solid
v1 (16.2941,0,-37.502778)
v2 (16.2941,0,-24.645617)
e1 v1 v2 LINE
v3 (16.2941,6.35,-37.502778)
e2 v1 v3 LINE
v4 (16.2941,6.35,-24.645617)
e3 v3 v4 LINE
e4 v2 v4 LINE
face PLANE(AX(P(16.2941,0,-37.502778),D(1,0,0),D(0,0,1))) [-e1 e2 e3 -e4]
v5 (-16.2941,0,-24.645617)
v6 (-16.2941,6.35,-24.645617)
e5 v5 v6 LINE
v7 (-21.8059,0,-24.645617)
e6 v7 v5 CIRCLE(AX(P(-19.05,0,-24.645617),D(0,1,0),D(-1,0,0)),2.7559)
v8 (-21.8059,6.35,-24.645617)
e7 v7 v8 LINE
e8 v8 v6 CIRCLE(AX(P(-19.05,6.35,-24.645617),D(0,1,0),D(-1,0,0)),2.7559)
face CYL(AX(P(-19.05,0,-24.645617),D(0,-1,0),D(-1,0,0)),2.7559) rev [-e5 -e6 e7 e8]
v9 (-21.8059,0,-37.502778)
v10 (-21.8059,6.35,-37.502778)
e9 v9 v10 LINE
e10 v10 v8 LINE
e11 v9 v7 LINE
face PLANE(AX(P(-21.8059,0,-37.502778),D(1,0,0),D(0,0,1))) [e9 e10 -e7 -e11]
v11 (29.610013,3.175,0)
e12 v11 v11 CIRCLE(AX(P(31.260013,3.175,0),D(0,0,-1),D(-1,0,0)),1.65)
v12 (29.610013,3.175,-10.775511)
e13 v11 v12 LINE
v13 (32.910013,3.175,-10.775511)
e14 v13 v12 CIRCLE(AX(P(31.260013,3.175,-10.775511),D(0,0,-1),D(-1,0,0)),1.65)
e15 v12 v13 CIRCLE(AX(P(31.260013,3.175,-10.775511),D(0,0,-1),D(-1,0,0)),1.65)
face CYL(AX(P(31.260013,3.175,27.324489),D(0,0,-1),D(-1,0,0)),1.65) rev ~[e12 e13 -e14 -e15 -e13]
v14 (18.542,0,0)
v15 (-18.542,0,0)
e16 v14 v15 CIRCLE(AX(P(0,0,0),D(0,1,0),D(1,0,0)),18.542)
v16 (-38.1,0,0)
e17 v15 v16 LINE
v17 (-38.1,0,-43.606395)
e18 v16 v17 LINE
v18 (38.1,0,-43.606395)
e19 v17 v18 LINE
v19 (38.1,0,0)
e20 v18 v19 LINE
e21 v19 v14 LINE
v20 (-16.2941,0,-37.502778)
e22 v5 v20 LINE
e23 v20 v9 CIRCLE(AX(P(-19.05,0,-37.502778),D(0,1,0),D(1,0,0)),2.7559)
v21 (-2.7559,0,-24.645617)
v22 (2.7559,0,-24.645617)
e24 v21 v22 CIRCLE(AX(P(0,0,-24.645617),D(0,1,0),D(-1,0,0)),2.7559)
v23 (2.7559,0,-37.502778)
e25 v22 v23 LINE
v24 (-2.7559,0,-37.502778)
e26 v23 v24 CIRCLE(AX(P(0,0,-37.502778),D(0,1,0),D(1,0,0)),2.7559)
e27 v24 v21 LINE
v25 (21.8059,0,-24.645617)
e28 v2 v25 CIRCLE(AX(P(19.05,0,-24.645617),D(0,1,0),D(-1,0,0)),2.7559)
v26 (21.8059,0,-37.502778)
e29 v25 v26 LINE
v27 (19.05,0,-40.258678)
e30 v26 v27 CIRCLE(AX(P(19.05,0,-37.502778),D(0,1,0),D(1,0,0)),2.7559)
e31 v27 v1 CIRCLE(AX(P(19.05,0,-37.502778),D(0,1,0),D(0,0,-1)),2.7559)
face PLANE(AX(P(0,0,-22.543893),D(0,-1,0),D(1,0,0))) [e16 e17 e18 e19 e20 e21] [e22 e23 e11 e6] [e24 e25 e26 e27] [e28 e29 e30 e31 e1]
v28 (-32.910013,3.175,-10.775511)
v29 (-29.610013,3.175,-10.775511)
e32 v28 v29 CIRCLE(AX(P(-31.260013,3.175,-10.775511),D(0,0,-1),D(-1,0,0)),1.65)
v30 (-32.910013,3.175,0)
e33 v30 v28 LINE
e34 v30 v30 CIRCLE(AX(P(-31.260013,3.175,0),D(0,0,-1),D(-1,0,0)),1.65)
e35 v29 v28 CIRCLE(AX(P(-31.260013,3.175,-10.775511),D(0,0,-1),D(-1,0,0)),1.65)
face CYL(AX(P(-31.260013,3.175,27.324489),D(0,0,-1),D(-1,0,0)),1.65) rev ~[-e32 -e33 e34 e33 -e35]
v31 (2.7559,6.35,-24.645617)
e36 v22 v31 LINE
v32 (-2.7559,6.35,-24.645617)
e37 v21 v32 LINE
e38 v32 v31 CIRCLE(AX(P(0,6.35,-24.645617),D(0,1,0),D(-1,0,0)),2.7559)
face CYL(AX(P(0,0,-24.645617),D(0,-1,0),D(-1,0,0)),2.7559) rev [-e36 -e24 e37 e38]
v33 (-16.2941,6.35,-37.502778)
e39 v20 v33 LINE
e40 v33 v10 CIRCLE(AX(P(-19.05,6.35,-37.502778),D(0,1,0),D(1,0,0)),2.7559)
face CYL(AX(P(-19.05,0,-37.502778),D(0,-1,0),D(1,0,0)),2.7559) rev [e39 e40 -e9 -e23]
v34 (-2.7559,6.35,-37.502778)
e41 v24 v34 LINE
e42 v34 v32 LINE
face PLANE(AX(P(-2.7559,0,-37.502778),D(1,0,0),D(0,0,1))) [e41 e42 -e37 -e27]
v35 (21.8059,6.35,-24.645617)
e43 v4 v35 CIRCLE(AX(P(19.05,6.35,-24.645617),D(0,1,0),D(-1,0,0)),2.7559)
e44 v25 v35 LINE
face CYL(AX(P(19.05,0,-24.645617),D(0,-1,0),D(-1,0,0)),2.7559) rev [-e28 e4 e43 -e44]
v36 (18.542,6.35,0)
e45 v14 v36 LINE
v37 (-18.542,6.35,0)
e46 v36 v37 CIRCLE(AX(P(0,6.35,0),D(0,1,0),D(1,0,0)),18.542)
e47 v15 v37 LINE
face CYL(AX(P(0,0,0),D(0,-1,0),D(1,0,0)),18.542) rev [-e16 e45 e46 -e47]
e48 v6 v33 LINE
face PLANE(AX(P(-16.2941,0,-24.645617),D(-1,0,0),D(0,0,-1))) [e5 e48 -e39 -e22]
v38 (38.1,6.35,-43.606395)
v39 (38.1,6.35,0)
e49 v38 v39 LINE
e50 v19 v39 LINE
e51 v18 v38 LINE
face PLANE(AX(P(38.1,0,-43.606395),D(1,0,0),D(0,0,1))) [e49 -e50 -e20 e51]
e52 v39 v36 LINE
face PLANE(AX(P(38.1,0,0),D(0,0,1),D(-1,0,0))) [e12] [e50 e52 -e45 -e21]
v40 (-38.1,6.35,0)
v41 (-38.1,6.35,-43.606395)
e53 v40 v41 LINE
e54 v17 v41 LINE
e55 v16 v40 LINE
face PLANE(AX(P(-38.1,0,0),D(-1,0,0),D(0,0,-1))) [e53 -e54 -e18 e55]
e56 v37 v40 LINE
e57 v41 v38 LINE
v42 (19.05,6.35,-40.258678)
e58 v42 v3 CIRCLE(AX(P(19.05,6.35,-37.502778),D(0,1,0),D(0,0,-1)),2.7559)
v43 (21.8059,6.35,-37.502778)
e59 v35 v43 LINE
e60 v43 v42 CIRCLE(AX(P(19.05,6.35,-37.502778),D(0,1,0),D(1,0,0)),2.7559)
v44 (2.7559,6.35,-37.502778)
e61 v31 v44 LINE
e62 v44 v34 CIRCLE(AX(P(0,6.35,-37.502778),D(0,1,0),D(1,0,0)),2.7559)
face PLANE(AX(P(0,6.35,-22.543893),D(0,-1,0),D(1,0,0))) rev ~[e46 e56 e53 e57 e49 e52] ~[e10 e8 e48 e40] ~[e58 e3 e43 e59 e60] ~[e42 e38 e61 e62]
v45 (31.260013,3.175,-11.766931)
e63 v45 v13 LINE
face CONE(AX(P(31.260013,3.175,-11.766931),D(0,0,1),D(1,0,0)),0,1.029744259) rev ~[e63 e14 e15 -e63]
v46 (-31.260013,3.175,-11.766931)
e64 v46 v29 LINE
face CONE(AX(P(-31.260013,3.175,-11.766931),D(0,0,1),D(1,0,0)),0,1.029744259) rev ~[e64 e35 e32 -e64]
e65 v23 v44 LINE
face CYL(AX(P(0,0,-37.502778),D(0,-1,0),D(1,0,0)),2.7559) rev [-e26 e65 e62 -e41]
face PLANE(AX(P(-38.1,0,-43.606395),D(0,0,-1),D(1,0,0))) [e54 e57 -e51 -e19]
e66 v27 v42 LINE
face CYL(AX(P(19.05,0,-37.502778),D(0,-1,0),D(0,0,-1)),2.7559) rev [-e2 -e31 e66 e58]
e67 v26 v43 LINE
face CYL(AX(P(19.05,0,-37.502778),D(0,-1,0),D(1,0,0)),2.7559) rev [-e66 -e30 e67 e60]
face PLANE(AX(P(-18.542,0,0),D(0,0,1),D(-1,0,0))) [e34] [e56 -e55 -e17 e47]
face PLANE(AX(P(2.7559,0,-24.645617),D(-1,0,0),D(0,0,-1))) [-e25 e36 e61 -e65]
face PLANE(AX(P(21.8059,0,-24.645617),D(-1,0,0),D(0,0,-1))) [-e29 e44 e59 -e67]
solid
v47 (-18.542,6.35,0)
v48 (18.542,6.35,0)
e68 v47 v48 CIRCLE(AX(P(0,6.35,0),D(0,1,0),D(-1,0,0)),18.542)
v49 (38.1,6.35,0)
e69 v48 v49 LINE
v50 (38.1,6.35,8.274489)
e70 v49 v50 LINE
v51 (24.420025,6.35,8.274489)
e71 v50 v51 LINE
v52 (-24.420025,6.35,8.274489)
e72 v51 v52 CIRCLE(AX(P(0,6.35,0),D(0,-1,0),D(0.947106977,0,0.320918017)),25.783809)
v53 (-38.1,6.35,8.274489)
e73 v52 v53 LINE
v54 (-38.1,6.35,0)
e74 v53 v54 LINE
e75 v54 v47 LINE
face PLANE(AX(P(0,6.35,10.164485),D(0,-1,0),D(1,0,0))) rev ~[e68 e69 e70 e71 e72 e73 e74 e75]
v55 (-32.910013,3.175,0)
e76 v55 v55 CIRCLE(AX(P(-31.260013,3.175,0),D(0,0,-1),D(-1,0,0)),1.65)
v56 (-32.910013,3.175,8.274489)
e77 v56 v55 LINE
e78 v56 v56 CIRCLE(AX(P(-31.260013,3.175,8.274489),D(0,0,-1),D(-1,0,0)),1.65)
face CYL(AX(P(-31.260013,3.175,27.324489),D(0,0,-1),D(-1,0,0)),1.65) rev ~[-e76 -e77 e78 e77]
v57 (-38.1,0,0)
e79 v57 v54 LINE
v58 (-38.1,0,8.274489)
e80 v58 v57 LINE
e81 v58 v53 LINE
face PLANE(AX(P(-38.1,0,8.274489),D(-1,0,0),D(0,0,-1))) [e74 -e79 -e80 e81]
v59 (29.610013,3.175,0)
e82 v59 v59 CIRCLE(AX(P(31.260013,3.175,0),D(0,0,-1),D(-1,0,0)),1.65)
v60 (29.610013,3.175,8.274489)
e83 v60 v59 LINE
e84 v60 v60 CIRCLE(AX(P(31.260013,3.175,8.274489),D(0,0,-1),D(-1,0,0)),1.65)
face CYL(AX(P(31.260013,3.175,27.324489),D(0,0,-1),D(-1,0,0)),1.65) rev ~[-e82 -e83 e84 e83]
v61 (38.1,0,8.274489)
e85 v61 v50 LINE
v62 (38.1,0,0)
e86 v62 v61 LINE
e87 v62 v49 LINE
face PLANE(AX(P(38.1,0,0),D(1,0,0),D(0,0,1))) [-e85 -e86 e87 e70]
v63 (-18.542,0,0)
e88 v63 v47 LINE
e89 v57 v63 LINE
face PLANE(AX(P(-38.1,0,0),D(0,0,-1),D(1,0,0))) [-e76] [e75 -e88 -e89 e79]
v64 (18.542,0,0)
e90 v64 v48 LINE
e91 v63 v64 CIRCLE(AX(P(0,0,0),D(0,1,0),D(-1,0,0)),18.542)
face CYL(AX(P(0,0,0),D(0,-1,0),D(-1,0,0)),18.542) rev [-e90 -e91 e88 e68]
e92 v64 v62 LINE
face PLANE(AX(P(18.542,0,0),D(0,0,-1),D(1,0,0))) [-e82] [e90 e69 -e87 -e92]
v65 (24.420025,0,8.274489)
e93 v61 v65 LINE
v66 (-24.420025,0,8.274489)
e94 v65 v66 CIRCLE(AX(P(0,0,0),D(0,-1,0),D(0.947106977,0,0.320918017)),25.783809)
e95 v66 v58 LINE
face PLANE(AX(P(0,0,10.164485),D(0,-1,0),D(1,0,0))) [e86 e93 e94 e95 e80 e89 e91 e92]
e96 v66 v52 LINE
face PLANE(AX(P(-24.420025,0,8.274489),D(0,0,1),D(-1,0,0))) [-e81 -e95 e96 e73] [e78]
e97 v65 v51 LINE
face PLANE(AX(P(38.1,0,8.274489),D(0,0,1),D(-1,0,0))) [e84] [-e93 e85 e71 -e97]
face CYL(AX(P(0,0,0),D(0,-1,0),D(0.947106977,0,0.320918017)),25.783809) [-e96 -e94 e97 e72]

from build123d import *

# Parameters (mm, degrees)
F1_DEPTH         = 6.35
F2_DEPTH         = 6.35
F5_D             = 3.3
F5_DEPTH         = 19.05
F5_TIP           = 0.9914200214
F5_2_D           = 3.3
F5_2_DEPTH       = 19.05
F5_2_TIP         = 0.9914200214
F5_ON_F4_D       = 3.3
F5_ON_F4_DEPTH   = 19.05
F5_ON_F4_TIP     = 0.9914200214
F5_ON_F4_2_D     = 3.3
F5_ON_F4_2_DEPTH = 19.05
F5_ON_F4_2_TIP   = 0.9914200214


# Not quite as in the source:
# - a feature names something its author has since deleted; it is built from what else it names


with BuildPart() as f1:
    # F0 (on Front) → F1 (new body)
    with BuildSketch(Plane.XZ):
        with BuildLine():
            Line((-38.1, 0), (-38.1, -43.6063950042))
            Line((-38.1, -43.6063950042), (0, -43.6063950042))
            Line((0, -43.6063950042), (19.05, -43.6063950042))
            Line((19.05, -43.6063950042), (38.1, -43.6063950042))
            Line((38.1, -43.6063950042), (38.1, 0))
            Line((38.1, 0), (18.542, 0))
            ThreePointArc((18.542, 0), (0, -18.542), (-18.542, 0))
            Line((-18.542, 0), (-38.1, 0))
        make_face()
        with BuildLine():
            ThreePointArc((-21.8059, -24.6456172317), (-19.05, -21.8897172317), (-16.2941, -24.6456172317))
            Line((-16.2941, -24.6456172317), (-16.2941, -37.5027777724))
            ThreePointArc((-16.2941, -37.5027777724), (-19.05, -40.2586777724), (-21.8059, -37.5027777724))
            Line((-21.8059, -37.5027777724), (-21.8059, -24.6456172317))
        make_face(mode=Mode.SUBTRACT)
        with BuildLine():
            ThreePointArc((-2.7559, -24.6456172317), (0, -21.8897172317), (2.7559, -24.6456172317))
            Line((2.7559, -24.6456172317), (2.7559, -37.5027777724))
            ThreePointArc((2.7559, -37.5027777724), (0, -40.2586777724), (-2.7559, -37.5027777724))
            Line((-2.7559, -37.5027777724), (-2.7559, -24.6456172317))
        make_face(mode=Mode.SUBTRACT)
        with BuildLine():
            ThreePointArc((21.8059, -37.5027777724), (20.9987155783, -39.4514933507), (19.05, -40.2586777724))
            ThreePointArc((19.05, -40.2586777724), (17.1012844217, -39.4514933507), (16.2941, -37.5027777724))
            Line((16.2941, -37.5027777724), (16.2941, -24.6456172317))
            ThreePointArc((16.2941, -24.6456172317), (19.05, -21.8897172317), (21.8059, -24.6456172317))
            Line((21.8059, -24.6456172317), (21.8059, -37.5027777724))
        make_face(mode=Mode.SUBTRACT)
    extrude(amount=-F1_DEPTH)

    # F5
    with Locations(Plane.XY.offset(8.2744888681)):
        with Locations((-31.260012702, 3.175)):
            Hole(F5_D / 2, depth=F5_DEPTH)
            with Locations((0, 0, -(F5_DEPTH + F5_TIP / 2))):  # 118° drill point
                Cone(0, F5_D / 2, F5_TIP, mode=Mode.SUBTRACT)

    # F5 on F4
    with Locations(Plane.XY.offset(8.2744888681)):
        with Locations((31.260012702, 3.175)):
            Hole(F5_ON_F4_D / 2, depth=F5_ON_F4_DEPTH)
            with Locations((0, 0, -(F5_ON_F4_DEPTH + F5_ON_F4_TIP / 2))):  # 118° drill point
                Cone(0, F5_ON_F4_D / 2, F5_ON_F4_TIP, mode=Mode.SUBTRACT)


with BuildPart() as f2:
    # F0 (on Front) → F2 (new body)
    with BuildSketch(Plane.XZ):
        with BuildLine():
            Line((-38.1, 8.2744888681), (-38.1, 0))
            Line((-38.1, 0), (-18.542, 0))
            ThreePointArc((-18.542, 0), (0, 18.542), (18.542, 0))
            Line((18.542, 0), (38.1, 0))
            Line((38.1, 0), (38.1, 8.2744888681))
            Line((38.1, 8.2744888681), (24.4200254041, 8.2744888681))
            ThreePointArc((24.4200254041, 8.2744888681), (0, 25.7838090042), (-24.4200254041, 8.2744888681))
            Line((-24.4200254041, 8.2744888681), (-38.1, 8.2744888681))
        make_face()
    extrude(amount=-F2_DEPTH)

    # F5#2
    with Locations(Plane.XY.offset(8.2744888681)):
        with Locations((-31.260012702, 3.175)):
            Hole(F5_2_D / 2, depth=F5_2_DEPTH)
            with Locations((0, 0, -(F5_2_DEPTH + F5_2_TIP / 2))):  # 118° drill point
                Cone(0, F5_2_D / 2, F5_2_TIP, mode=Mode.SUBTRACT)

    # F5 on F4#2
    with Locations(Plane.XY.offset(8.2744888681)):
        with Locations((31.260012702, 3.175)):
            Hole(F5_ON_F4_2_D / 2, depth=F5_ON_F4_2_DEPTH)
            with Locations((0, 0, -(F5_ON_F4_2_DEPTH + F5_ON_F4_2_TIP / 2))):  # 118° drill point
                Cone(0, F5_ON_F4_2_D / 2, F5_ON_F4_2_TIP, mode=Mode.SUBTRACT)


solid = Compound([f1.part, f2.part])
